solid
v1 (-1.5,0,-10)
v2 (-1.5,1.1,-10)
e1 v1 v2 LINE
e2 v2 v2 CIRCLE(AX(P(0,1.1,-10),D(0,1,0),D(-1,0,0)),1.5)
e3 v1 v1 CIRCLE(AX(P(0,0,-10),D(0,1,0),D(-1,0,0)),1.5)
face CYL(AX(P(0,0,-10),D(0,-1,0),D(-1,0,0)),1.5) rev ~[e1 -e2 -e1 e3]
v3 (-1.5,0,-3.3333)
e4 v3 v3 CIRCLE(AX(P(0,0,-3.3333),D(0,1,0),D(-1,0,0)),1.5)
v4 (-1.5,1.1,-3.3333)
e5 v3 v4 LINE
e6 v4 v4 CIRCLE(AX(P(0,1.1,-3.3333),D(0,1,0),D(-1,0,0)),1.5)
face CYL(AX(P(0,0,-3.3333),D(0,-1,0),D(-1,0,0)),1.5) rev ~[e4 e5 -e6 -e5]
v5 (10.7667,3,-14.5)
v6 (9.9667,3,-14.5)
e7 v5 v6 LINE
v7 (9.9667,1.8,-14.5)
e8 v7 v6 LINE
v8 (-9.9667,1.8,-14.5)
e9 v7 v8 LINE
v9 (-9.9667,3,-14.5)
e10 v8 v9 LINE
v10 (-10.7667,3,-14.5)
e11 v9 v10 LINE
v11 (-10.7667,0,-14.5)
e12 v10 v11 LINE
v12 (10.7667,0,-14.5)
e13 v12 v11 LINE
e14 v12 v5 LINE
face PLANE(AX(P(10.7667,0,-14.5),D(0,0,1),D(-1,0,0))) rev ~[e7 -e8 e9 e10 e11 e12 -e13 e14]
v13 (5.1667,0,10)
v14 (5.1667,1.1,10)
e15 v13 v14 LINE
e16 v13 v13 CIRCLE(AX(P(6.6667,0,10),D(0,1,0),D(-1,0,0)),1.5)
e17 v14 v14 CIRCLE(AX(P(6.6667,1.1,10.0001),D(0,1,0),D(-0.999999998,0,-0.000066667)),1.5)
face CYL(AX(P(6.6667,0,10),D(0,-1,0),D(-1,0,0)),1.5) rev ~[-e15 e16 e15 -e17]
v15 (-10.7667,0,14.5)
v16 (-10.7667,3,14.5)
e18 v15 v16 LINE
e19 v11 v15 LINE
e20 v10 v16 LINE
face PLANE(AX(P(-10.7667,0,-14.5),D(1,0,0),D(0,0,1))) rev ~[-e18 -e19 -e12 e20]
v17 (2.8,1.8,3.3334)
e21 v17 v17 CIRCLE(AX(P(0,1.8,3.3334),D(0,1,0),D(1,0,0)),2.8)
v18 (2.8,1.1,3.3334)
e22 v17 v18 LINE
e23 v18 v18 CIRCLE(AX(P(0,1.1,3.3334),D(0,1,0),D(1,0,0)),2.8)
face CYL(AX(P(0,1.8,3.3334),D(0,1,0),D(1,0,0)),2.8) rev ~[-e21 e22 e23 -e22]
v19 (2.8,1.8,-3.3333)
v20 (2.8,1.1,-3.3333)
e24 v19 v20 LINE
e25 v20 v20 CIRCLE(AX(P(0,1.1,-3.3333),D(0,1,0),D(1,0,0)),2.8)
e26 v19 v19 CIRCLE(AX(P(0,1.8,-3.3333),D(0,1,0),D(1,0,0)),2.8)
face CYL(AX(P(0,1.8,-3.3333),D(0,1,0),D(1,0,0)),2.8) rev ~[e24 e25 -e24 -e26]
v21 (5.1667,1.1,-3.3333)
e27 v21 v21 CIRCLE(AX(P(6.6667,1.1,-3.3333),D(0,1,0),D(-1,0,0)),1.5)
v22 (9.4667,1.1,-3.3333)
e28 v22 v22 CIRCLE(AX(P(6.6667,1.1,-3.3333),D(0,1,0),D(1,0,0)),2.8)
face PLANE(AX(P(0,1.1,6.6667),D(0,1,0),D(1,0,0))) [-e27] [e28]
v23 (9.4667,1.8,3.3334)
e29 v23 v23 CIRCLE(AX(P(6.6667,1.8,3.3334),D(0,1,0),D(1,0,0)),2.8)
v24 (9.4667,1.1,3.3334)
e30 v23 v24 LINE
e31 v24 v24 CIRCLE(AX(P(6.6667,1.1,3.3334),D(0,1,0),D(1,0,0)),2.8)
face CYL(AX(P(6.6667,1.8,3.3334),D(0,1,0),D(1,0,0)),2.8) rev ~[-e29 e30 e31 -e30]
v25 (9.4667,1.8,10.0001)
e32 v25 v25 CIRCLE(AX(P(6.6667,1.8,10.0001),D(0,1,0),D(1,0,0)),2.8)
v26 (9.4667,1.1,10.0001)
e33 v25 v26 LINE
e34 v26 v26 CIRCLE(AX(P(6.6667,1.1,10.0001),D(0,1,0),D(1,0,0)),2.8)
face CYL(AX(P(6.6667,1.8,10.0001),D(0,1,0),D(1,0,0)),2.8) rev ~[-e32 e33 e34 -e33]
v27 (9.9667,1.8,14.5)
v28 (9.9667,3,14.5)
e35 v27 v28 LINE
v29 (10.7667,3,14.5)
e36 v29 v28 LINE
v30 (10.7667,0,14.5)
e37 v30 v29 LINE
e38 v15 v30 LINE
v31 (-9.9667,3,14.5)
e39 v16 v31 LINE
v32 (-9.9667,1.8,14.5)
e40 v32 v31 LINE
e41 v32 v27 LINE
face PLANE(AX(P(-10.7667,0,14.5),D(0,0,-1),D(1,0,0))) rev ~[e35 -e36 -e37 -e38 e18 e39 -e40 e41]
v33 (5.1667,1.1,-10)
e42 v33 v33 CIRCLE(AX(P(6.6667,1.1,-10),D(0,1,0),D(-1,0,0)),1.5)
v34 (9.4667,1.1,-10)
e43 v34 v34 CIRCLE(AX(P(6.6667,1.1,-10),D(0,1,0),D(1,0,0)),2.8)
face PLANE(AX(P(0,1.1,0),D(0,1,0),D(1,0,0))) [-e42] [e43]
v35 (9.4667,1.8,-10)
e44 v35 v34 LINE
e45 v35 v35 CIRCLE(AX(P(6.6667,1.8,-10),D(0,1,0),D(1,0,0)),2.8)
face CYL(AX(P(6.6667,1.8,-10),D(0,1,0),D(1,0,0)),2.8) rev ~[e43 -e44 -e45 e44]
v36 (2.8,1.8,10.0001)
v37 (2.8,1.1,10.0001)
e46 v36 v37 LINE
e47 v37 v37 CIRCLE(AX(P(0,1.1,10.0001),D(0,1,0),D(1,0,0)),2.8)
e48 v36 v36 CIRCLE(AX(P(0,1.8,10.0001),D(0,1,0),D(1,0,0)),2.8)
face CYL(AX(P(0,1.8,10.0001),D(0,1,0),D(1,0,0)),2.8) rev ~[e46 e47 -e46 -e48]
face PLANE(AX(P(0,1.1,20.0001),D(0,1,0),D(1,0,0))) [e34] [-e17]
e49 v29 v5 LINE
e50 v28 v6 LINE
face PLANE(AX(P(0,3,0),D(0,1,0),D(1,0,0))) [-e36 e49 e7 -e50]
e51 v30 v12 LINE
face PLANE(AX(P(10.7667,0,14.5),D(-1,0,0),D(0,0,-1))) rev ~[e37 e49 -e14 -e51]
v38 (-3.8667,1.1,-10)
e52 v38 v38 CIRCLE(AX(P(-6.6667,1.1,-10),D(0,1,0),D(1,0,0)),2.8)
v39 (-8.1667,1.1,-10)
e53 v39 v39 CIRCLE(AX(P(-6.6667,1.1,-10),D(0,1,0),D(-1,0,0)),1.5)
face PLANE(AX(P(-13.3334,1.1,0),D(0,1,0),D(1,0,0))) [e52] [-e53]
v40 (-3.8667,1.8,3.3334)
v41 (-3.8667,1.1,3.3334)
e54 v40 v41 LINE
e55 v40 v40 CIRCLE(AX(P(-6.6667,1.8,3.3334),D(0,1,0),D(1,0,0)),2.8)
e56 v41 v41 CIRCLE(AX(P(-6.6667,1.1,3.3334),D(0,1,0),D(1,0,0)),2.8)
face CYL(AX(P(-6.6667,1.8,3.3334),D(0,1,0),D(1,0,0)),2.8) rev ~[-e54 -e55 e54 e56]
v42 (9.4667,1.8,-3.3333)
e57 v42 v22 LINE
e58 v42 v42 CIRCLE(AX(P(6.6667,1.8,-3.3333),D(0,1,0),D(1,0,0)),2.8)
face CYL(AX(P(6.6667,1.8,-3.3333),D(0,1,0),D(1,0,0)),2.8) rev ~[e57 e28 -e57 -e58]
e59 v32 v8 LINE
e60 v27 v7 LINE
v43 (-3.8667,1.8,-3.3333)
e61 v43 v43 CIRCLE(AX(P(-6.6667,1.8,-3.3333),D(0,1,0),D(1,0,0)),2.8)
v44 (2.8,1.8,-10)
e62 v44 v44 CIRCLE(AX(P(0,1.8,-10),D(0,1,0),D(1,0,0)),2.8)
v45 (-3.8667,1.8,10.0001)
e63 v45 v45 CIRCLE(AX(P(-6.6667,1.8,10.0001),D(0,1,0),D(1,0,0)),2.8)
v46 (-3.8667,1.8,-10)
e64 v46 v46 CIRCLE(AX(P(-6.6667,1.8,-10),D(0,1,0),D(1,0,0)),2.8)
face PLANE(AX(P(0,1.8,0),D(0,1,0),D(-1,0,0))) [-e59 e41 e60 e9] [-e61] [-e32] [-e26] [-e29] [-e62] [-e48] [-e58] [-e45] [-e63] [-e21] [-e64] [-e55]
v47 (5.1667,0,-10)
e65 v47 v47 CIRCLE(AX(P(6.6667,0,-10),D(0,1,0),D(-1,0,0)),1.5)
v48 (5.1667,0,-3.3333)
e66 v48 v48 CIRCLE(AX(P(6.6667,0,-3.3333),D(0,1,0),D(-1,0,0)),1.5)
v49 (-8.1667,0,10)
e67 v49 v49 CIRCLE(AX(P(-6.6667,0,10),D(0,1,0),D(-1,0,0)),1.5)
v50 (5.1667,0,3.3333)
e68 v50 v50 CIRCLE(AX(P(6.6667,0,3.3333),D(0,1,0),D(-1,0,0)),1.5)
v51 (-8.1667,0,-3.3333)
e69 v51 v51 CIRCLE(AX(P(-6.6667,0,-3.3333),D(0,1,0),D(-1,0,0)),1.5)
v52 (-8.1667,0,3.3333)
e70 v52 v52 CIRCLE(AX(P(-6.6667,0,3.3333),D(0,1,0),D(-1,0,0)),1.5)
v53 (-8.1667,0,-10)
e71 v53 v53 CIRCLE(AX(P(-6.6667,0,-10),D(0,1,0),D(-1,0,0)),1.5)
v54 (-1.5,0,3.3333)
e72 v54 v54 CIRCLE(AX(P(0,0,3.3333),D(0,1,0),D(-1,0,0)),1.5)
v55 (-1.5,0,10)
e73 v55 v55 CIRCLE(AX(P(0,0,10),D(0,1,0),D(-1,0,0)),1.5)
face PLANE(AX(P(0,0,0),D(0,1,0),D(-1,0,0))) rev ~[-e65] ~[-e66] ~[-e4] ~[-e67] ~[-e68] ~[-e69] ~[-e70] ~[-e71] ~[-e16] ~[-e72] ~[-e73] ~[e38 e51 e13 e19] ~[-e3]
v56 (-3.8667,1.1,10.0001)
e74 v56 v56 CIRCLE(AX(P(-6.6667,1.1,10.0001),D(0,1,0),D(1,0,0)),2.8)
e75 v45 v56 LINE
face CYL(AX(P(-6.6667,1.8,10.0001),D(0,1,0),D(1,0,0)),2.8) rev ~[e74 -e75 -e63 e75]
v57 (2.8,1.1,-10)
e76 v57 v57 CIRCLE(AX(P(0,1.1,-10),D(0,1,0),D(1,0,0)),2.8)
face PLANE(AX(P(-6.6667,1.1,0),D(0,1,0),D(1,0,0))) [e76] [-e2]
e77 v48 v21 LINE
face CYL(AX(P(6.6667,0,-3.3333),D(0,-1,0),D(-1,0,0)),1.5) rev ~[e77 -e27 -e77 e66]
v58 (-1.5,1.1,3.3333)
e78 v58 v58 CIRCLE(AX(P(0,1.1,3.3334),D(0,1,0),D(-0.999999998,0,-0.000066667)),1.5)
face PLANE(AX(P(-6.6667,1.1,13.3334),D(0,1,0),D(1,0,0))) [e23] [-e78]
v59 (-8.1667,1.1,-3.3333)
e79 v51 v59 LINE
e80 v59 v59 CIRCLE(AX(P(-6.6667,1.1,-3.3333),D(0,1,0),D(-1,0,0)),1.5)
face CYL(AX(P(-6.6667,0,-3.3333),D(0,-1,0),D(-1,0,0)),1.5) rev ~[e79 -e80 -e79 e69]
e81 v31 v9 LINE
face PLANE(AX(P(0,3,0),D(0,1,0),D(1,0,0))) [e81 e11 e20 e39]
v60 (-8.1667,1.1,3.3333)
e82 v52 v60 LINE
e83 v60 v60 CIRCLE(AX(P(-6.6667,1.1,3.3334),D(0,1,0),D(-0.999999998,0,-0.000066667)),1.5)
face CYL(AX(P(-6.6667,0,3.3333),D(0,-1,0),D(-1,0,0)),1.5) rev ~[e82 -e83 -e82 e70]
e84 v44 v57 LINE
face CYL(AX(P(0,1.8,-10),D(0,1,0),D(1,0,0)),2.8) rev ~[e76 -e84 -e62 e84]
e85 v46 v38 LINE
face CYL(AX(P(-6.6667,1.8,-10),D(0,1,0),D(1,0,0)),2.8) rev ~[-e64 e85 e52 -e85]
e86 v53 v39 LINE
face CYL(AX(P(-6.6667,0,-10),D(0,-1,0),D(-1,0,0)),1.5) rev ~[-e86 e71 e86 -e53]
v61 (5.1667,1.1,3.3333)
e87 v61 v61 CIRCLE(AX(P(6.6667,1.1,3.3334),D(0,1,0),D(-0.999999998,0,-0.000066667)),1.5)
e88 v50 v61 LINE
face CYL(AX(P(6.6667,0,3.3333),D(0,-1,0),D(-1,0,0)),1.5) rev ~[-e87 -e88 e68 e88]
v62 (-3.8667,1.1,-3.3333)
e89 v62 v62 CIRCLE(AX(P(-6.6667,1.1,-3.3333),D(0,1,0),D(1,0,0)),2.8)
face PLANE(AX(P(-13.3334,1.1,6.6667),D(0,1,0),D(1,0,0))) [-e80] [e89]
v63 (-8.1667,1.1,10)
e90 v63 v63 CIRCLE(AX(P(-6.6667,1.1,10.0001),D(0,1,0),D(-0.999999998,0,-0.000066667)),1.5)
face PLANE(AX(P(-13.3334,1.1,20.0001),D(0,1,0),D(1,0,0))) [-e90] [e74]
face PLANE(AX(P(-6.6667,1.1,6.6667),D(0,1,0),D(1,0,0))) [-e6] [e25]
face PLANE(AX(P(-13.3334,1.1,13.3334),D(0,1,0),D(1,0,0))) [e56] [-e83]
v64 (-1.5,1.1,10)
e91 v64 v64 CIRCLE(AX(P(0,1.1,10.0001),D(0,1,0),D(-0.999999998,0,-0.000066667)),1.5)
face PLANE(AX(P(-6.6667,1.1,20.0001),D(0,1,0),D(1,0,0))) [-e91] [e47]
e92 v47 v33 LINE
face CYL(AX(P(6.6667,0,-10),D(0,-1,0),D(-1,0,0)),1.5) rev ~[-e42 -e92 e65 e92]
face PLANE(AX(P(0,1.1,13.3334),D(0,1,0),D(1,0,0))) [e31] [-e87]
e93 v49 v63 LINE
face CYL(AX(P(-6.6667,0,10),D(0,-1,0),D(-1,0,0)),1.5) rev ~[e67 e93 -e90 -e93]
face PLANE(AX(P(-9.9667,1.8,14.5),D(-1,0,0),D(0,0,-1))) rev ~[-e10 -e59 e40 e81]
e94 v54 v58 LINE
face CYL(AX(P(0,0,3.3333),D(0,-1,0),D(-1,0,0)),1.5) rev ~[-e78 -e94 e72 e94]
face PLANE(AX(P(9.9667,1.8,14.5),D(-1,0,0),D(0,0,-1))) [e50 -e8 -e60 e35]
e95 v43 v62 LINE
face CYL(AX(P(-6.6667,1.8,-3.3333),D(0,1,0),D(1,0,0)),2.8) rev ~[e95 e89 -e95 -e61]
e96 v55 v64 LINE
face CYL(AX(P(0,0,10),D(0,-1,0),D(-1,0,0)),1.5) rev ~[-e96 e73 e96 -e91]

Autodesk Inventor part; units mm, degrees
ref_plane "Плоскость YZ" through (0, 0, 0) normal (1, 0, 0) x (0, 1, 0)
ref_plane "Плоскость XZ" through (0, 0, 0) normal (0, 1, 0) x (-1, 0, 0)
ref_plane "Плоскость XY" through (0, 0, 0) normal (0, 0, 1) x (1, 0, 0)
sketch "Эскиз1" plane through (0, 0, 0) normal (0, 1, 0) x (-1, 0, 0)
  line L0 (9.1667, 12.5) -> (-9.1667, 12.5)
  line L1 (-9.1667, 12.5) -> (-9.1667, -12.5)
  line L2 (-9.1667, -12.5) -> (9.1667, -12.5)
  line L3 (9.1667, -12.5) -> (9.1667, 12.5)
  line L4 (9.1667, 12.5) -> (-9.1667, -12.5) construction
  line L5 (-9.1667, 12.5) -> (9.1667, -12.5) construction
  line L6 (10.7667, 14.5) -> (-10.7667, 14.5)
  line L7 (-10.7667, 14.5) -> (-10.7667, -14.5)
  line L8 (-10.7667, -14.5) -> (10.7667, -14.5)
  line L9 (10.7667, -14.5) -> (10.7667, 14.5)
  line L10 (10.7667, 14.5) -> (-10.7667, -14.5) construction
  line L11 (-10.7667, 14.5) -> (10.7667, -14.5) construction
  circle A0 centre (6.6667, 10) radius 1.5
  circle A1 centre (6.6667, 3.3333) radius 1.5
  circle A2 centre (6.6667, -3.3333) radius 1.5
  circle A3 centre (6.6667, -10) radius 1.5
  circle A4 centre (0, 10) radius 1.5
  circle A5 centre (0, 3.3333) radius 1.5
  circle A6 centre (0, -3.3333) radius 1.5
  circle A7 centre (0, -10) radius 1.5
  circle A8 centre (-6.6667, 10) radius 1.5
  circle A9 centre (-6.6667, 3.3333) radius 1.5
  circle A10 centre (-6.6667, -3.3333) radius 1.5
  circle A11 centre (-6.6667, -10) radius 1.5
  point P0 (0, 0)
  dimension "d0" = 18.3333
  dimension "d1" = 25
  dimension "d2" = 1.6
  dimension "d3" = 2
  dimension "d4" = 3
  dimension "d5" = 2.5
  dimension "d6" = 2.5
  dimension "d9" = 6.6667
  dimension "d12" = 6.6667
extrude "Выдавливание1" add sketch "Эскиз1" along normal blind 1.8 contours L3 L2 L1 L0 | L9 L8 L7 L6
sketch "Эскиз2" plane through (0, 1.8, 0) normal (0, 1, 0) x (1, 0, 0)
  circle A0 centre (6.6667, 10) radius 1.5 projected
  circle A1 centre (6.6667, -3.3333) radius 1.5 projected
  circle A2 centre (0, 10) radius 1.5 projected
  circle A3 centre (0, 3.3333) radius 1.5 projected
  circle A4 centre (0, -3.3333) radius 1.5 projected
  circle A5 centre (0, -10) radius 1.5 projected
  circle A6 centre (-6.6667, 10) radius 1.5 projected
  circle A7 centre (-6.6667, 3.3333) radius 1.5 projected
  circle A8 centre (-6.6667, -3.3333) radius 1.5 projected
  circle A9 centre (-6.6667, -10) radius 1.5 projected
  circle A10 centre (6.6667, -10) radius 1.5 projected
  circle A11 centre (6.6667, 3.3333) radius 1.5 projected
  circle A12 centre (6.6667, 10) radius 1.5 projected
  circle A13 centre (6.6667, 10) radius 2.8
  point P0 (0, 0)
  dimension "d39" = 5.6
extrude "Выдавливание2" cut sketch "Эскиз2" against normal blind 0.7 contours A13
sketch "Эскиз3" plane through (0, 1.8, 0) normal (0, 1, 0) x (1, 0, 0)
  line L0 (-10.7667, 14.5) -> (-10.7667, -14.5) projected
  line L1 (10.7667, 14.5) -> (-10.7667, 14.5) projected
  line L2 (-10.7667, -14.5) -> (-9.9667, -14.5)
  line L3 (-9.9667, -14.5) -> (-9.9667, 14.5)
  line L4 (-9.9667, 14.5) -> (-10.7667, 14.5)
  line L5 (-10.7667, 14.5) -> (-10.7667, -14.5)
  line L6 (10.7667, -14.5) -> (10.7667, 14.5) projected
  line L7 (10.7667, -14.5) -> (9.9667, -14.5)
  line L8 (9.9667, -14.5) -> (9.9667, 14.5)
  line L9 (9.9667, 14.5) -> (10.7667, 14.5)
  line L10 (10.7667, 14.5) -> (10.7667, -14.5)
  point P0 (0, 0)
  point P1 (9.9667, 14.5)
  dimension "d29" = 0.8
  dimension "d30" = 0.8
extrude "Выдавливание3" add sketch "Эскиз3" along normal blind 1.2
pattern_linear "Прямоуг.массив2" count 4 spacing 6.6667 along (0, 0, 1) count 3 spacing 6.6667 along (-1, 0, 0) of "Выдавливание2"
equation "\"d6\" = d5"
equation "\"d30\" = d29"
properties part number "HolesHelper" material "Типовой"
